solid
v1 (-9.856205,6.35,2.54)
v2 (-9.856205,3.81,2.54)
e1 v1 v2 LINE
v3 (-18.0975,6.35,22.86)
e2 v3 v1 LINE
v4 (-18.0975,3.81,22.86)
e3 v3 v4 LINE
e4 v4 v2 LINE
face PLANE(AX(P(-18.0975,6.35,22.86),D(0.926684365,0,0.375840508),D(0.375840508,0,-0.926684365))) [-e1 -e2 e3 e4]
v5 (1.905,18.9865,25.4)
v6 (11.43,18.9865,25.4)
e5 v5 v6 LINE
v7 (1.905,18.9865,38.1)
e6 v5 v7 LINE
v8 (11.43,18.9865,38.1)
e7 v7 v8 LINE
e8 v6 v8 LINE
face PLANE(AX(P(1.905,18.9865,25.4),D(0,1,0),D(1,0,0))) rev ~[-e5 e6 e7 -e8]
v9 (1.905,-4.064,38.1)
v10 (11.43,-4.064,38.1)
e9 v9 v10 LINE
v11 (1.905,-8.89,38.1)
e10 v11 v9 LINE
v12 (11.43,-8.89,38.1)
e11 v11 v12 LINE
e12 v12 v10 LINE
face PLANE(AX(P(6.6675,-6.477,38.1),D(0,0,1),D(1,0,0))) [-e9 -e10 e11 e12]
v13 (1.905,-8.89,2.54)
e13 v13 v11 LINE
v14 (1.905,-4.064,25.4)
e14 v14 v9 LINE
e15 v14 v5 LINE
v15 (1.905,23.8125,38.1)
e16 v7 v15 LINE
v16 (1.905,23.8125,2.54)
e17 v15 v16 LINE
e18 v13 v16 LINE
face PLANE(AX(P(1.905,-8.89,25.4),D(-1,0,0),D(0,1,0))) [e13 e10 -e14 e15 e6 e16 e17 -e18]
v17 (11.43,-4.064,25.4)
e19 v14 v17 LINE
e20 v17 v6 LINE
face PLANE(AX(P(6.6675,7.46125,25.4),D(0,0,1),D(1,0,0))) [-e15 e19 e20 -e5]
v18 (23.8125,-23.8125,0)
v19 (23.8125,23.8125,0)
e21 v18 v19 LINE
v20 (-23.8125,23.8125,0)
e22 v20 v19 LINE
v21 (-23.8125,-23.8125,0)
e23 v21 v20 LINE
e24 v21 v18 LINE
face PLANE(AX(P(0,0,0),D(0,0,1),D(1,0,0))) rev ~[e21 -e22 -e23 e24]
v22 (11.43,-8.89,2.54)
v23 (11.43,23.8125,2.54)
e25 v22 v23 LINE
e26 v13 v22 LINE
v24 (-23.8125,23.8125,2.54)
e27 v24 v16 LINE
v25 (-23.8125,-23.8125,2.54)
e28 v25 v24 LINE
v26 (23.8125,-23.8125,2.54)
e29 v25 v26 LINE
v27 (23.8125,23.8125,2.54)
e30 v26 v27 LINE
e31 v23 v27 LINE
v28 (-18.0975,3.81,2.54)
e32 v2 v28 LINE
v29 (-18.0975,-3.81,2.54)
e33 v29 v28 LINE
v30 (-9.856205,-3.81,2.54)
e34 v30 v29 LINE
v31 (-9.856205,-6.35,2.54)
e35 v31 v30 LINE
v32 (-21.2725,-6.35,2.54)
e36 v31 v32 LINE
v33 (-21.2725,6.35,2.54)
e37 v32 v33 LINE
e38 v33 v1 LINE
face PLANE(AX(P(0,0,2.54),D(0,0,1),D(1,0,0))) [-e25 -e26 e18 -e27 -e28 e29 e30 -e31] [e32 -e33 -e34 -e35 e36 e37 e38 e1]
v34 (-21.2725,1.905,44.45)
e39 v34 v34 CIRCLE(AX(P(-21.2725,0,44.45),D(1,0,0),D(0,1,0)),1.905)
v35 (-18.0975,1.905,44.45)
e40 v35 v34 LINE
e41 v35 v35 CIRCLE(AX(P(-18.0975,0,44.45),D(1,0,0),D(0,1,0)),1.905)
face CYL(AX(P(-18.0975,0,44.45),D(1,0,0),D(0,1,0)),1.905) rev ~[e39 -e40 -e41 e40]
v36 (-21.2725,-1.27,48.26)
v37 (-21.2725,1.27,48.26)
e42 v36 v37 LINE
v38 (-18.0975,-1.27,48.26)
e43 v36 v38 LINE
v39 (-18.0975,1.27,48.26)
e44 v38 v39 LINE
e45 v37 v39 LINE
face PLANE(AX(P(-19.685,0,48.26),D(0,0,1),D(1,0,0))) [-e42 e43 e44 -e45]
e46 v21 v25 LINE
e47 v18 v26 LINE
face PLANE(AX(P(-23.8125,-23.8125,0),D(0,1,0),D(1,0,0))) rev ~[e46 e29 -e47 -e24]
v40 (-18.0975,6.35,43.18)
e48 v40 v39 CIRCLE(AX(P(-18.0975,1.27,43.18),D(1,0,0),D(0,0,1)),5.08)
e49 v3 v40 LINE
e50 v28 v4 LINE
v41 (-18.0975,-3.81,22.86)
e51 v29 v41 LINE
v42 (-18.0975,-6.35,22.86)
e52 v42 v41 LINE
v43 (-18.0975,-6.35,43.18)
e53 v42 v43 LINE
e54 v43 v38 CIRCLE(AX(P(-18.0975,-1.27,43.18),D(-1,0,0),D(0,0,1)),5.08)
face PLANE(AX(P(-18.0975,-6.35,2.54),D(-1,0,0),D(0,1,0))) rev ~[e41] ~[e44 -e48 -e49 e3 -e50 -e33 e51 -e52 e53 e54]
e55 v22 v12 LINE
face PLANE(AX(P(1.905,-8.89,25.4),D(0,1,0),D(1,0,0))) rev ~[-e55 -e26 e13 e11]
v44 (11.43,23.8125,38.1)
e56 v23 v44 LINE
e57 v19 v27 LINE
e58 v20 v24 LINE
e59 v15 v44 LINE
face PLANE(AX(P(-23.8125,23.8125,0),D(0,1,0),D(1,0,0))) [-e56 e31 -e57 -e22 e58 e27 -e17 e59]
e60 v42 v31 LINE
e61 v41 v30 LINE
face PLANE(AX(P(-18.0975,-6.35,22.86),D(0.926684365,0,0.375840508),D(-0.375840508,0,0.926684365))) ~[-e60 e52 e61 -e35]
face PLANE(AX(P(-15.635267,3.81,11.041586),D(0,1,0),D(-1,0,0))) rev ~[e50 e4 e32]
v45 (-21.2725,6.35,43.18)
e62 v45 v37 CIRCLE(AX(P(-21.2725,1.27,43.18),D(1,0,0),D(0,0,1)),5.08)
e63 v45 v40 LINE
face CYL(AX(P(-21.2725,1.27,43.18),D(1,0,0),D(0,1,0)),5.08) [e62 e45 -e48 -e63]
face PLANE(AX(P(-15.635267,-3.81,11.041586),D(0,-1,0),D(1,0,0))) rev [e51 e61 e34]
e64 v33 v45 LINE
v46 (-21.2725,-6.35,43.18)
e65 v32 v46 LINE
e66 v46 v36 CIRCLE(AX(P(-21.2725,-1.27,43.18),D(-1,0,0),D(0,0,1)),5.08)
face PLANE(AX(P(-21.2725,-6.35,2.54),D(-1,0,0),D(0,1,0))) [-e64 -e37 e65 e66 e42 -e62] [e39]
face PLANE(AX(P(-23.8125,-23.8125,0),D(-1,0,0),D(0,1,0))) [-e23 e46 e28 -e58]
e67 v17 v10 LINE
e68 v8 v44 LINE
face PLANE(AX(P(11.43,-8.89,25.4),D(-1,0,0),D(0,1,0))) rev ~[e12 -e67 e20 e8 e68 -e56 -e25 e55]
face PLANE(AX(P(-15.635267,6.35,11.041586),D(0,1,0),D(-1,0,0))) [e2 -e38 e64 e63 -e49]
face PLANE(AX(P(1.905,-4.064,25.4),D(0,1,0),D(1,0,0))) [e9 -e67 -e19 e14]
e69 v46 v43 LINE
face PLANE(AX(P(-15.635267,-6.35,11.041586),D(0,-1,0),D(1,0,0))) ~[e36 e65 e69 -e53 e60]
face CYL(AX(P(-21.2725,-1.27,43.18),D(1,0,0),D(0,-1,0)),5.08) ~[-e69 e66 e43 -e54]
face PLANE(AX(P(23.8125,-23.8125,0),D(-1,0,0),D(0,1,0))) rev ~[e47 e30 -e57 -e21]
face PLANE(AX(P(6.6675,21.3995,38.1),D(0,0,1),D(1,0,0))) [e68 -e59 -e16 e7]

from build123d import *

# Parameters (mm, degrees)
F0_W      = 47.625
F0_H      = 47.625
F1_DEPTH  = 2.54
F3_W      = 9.525
F3_H      = 32.7025
F4_DEPTH  = 22.86
F5_W      = 9.525
F5_H      = 4.826
F6_DEPTH  = 12.7
F7_W      = 3.175
F7_H      = 12.7
F8_DEPTH  = 45.72
F9_R      = 1.905
F10_DEPTH = 25.4
F11_R     = 5.08
F13_DEPTH = 2.54


# Not quite as in the source:
# - a pattern or mirror of a feature is missing from the dataset's text; its kind, count and spacing are read off the source's solid


with BuildPart() as f1:
    # F0 (on Top) → F1 (new body)
    with BuildSketch(Plane.XY):
        Rectangle(F0_W, F0_H)
    extrude(amount=F1_DEPTH)

    # F3 (on face) → F4 (join)
    with BuildSketch(Plane.XY.offset(2.54)):
        with Locations((6.6675, 7.46125)):
            Rectangle(F3_W, F3_H)
    extrude(amount=F4_DEPTH)

    # F5 (on face) → F6 (join)
    with BuildSketch(Plane.XY.offset(25.4)):
        with Locations((6.6675, -6.477)):
            Rectangle(F5_W, F5_H)
        with Locations((6.6675, 21.3995)):
            Rectangle(F5_W, F5_H)
    extrude(amount=F6_DEPTH)

    # F7 (on face) → F8 (join)
    with BuildSketch(Plane.XY.offset(2.54)):
        with Locations((-19.685, 0)):
            Rectangle(F7_W, F7_H)
    extrude(amount=F8_DEPTH)

    # F9 (on face) → F10 (cut)
    with BuildSketch(Plane.YZ.offset(-18.0975)):
        with Locations((0, 44.45)):
            Circle(F9_R)
    extrude(amount=-F10_DEPTH, mode=Mode.SUBTRACT)

    # F11
    f11_edges = [f1.edges().sort_by_distance(p)[0] for p in [
        (-19.685, 6.35, 48.26),
        (-19.685, -6.35, 48.26),
    ]]
    fillet(f11_edges, radius=F11_R)

    # F12 (on face) → F13 (join)
    with BuildSketch(Plane(origin=(0, 6.35, 0), x_dir=(-1, 0, 0), z_dir=(0, 1, 0))):
        Polygon((18.0975, 2.54), (18.0975, 22.86), (9.8562051214, 2.54), align=None)
    f13 = extrude(amount=-F13_DEPTH)

    # F13_copies: F13 across plane
    add(f13.mirror(Plane(origin=(0, 0, 0), x_dir=(0, 0, -1), z_dir=(0, -1, 0))))


solid = f1.part
